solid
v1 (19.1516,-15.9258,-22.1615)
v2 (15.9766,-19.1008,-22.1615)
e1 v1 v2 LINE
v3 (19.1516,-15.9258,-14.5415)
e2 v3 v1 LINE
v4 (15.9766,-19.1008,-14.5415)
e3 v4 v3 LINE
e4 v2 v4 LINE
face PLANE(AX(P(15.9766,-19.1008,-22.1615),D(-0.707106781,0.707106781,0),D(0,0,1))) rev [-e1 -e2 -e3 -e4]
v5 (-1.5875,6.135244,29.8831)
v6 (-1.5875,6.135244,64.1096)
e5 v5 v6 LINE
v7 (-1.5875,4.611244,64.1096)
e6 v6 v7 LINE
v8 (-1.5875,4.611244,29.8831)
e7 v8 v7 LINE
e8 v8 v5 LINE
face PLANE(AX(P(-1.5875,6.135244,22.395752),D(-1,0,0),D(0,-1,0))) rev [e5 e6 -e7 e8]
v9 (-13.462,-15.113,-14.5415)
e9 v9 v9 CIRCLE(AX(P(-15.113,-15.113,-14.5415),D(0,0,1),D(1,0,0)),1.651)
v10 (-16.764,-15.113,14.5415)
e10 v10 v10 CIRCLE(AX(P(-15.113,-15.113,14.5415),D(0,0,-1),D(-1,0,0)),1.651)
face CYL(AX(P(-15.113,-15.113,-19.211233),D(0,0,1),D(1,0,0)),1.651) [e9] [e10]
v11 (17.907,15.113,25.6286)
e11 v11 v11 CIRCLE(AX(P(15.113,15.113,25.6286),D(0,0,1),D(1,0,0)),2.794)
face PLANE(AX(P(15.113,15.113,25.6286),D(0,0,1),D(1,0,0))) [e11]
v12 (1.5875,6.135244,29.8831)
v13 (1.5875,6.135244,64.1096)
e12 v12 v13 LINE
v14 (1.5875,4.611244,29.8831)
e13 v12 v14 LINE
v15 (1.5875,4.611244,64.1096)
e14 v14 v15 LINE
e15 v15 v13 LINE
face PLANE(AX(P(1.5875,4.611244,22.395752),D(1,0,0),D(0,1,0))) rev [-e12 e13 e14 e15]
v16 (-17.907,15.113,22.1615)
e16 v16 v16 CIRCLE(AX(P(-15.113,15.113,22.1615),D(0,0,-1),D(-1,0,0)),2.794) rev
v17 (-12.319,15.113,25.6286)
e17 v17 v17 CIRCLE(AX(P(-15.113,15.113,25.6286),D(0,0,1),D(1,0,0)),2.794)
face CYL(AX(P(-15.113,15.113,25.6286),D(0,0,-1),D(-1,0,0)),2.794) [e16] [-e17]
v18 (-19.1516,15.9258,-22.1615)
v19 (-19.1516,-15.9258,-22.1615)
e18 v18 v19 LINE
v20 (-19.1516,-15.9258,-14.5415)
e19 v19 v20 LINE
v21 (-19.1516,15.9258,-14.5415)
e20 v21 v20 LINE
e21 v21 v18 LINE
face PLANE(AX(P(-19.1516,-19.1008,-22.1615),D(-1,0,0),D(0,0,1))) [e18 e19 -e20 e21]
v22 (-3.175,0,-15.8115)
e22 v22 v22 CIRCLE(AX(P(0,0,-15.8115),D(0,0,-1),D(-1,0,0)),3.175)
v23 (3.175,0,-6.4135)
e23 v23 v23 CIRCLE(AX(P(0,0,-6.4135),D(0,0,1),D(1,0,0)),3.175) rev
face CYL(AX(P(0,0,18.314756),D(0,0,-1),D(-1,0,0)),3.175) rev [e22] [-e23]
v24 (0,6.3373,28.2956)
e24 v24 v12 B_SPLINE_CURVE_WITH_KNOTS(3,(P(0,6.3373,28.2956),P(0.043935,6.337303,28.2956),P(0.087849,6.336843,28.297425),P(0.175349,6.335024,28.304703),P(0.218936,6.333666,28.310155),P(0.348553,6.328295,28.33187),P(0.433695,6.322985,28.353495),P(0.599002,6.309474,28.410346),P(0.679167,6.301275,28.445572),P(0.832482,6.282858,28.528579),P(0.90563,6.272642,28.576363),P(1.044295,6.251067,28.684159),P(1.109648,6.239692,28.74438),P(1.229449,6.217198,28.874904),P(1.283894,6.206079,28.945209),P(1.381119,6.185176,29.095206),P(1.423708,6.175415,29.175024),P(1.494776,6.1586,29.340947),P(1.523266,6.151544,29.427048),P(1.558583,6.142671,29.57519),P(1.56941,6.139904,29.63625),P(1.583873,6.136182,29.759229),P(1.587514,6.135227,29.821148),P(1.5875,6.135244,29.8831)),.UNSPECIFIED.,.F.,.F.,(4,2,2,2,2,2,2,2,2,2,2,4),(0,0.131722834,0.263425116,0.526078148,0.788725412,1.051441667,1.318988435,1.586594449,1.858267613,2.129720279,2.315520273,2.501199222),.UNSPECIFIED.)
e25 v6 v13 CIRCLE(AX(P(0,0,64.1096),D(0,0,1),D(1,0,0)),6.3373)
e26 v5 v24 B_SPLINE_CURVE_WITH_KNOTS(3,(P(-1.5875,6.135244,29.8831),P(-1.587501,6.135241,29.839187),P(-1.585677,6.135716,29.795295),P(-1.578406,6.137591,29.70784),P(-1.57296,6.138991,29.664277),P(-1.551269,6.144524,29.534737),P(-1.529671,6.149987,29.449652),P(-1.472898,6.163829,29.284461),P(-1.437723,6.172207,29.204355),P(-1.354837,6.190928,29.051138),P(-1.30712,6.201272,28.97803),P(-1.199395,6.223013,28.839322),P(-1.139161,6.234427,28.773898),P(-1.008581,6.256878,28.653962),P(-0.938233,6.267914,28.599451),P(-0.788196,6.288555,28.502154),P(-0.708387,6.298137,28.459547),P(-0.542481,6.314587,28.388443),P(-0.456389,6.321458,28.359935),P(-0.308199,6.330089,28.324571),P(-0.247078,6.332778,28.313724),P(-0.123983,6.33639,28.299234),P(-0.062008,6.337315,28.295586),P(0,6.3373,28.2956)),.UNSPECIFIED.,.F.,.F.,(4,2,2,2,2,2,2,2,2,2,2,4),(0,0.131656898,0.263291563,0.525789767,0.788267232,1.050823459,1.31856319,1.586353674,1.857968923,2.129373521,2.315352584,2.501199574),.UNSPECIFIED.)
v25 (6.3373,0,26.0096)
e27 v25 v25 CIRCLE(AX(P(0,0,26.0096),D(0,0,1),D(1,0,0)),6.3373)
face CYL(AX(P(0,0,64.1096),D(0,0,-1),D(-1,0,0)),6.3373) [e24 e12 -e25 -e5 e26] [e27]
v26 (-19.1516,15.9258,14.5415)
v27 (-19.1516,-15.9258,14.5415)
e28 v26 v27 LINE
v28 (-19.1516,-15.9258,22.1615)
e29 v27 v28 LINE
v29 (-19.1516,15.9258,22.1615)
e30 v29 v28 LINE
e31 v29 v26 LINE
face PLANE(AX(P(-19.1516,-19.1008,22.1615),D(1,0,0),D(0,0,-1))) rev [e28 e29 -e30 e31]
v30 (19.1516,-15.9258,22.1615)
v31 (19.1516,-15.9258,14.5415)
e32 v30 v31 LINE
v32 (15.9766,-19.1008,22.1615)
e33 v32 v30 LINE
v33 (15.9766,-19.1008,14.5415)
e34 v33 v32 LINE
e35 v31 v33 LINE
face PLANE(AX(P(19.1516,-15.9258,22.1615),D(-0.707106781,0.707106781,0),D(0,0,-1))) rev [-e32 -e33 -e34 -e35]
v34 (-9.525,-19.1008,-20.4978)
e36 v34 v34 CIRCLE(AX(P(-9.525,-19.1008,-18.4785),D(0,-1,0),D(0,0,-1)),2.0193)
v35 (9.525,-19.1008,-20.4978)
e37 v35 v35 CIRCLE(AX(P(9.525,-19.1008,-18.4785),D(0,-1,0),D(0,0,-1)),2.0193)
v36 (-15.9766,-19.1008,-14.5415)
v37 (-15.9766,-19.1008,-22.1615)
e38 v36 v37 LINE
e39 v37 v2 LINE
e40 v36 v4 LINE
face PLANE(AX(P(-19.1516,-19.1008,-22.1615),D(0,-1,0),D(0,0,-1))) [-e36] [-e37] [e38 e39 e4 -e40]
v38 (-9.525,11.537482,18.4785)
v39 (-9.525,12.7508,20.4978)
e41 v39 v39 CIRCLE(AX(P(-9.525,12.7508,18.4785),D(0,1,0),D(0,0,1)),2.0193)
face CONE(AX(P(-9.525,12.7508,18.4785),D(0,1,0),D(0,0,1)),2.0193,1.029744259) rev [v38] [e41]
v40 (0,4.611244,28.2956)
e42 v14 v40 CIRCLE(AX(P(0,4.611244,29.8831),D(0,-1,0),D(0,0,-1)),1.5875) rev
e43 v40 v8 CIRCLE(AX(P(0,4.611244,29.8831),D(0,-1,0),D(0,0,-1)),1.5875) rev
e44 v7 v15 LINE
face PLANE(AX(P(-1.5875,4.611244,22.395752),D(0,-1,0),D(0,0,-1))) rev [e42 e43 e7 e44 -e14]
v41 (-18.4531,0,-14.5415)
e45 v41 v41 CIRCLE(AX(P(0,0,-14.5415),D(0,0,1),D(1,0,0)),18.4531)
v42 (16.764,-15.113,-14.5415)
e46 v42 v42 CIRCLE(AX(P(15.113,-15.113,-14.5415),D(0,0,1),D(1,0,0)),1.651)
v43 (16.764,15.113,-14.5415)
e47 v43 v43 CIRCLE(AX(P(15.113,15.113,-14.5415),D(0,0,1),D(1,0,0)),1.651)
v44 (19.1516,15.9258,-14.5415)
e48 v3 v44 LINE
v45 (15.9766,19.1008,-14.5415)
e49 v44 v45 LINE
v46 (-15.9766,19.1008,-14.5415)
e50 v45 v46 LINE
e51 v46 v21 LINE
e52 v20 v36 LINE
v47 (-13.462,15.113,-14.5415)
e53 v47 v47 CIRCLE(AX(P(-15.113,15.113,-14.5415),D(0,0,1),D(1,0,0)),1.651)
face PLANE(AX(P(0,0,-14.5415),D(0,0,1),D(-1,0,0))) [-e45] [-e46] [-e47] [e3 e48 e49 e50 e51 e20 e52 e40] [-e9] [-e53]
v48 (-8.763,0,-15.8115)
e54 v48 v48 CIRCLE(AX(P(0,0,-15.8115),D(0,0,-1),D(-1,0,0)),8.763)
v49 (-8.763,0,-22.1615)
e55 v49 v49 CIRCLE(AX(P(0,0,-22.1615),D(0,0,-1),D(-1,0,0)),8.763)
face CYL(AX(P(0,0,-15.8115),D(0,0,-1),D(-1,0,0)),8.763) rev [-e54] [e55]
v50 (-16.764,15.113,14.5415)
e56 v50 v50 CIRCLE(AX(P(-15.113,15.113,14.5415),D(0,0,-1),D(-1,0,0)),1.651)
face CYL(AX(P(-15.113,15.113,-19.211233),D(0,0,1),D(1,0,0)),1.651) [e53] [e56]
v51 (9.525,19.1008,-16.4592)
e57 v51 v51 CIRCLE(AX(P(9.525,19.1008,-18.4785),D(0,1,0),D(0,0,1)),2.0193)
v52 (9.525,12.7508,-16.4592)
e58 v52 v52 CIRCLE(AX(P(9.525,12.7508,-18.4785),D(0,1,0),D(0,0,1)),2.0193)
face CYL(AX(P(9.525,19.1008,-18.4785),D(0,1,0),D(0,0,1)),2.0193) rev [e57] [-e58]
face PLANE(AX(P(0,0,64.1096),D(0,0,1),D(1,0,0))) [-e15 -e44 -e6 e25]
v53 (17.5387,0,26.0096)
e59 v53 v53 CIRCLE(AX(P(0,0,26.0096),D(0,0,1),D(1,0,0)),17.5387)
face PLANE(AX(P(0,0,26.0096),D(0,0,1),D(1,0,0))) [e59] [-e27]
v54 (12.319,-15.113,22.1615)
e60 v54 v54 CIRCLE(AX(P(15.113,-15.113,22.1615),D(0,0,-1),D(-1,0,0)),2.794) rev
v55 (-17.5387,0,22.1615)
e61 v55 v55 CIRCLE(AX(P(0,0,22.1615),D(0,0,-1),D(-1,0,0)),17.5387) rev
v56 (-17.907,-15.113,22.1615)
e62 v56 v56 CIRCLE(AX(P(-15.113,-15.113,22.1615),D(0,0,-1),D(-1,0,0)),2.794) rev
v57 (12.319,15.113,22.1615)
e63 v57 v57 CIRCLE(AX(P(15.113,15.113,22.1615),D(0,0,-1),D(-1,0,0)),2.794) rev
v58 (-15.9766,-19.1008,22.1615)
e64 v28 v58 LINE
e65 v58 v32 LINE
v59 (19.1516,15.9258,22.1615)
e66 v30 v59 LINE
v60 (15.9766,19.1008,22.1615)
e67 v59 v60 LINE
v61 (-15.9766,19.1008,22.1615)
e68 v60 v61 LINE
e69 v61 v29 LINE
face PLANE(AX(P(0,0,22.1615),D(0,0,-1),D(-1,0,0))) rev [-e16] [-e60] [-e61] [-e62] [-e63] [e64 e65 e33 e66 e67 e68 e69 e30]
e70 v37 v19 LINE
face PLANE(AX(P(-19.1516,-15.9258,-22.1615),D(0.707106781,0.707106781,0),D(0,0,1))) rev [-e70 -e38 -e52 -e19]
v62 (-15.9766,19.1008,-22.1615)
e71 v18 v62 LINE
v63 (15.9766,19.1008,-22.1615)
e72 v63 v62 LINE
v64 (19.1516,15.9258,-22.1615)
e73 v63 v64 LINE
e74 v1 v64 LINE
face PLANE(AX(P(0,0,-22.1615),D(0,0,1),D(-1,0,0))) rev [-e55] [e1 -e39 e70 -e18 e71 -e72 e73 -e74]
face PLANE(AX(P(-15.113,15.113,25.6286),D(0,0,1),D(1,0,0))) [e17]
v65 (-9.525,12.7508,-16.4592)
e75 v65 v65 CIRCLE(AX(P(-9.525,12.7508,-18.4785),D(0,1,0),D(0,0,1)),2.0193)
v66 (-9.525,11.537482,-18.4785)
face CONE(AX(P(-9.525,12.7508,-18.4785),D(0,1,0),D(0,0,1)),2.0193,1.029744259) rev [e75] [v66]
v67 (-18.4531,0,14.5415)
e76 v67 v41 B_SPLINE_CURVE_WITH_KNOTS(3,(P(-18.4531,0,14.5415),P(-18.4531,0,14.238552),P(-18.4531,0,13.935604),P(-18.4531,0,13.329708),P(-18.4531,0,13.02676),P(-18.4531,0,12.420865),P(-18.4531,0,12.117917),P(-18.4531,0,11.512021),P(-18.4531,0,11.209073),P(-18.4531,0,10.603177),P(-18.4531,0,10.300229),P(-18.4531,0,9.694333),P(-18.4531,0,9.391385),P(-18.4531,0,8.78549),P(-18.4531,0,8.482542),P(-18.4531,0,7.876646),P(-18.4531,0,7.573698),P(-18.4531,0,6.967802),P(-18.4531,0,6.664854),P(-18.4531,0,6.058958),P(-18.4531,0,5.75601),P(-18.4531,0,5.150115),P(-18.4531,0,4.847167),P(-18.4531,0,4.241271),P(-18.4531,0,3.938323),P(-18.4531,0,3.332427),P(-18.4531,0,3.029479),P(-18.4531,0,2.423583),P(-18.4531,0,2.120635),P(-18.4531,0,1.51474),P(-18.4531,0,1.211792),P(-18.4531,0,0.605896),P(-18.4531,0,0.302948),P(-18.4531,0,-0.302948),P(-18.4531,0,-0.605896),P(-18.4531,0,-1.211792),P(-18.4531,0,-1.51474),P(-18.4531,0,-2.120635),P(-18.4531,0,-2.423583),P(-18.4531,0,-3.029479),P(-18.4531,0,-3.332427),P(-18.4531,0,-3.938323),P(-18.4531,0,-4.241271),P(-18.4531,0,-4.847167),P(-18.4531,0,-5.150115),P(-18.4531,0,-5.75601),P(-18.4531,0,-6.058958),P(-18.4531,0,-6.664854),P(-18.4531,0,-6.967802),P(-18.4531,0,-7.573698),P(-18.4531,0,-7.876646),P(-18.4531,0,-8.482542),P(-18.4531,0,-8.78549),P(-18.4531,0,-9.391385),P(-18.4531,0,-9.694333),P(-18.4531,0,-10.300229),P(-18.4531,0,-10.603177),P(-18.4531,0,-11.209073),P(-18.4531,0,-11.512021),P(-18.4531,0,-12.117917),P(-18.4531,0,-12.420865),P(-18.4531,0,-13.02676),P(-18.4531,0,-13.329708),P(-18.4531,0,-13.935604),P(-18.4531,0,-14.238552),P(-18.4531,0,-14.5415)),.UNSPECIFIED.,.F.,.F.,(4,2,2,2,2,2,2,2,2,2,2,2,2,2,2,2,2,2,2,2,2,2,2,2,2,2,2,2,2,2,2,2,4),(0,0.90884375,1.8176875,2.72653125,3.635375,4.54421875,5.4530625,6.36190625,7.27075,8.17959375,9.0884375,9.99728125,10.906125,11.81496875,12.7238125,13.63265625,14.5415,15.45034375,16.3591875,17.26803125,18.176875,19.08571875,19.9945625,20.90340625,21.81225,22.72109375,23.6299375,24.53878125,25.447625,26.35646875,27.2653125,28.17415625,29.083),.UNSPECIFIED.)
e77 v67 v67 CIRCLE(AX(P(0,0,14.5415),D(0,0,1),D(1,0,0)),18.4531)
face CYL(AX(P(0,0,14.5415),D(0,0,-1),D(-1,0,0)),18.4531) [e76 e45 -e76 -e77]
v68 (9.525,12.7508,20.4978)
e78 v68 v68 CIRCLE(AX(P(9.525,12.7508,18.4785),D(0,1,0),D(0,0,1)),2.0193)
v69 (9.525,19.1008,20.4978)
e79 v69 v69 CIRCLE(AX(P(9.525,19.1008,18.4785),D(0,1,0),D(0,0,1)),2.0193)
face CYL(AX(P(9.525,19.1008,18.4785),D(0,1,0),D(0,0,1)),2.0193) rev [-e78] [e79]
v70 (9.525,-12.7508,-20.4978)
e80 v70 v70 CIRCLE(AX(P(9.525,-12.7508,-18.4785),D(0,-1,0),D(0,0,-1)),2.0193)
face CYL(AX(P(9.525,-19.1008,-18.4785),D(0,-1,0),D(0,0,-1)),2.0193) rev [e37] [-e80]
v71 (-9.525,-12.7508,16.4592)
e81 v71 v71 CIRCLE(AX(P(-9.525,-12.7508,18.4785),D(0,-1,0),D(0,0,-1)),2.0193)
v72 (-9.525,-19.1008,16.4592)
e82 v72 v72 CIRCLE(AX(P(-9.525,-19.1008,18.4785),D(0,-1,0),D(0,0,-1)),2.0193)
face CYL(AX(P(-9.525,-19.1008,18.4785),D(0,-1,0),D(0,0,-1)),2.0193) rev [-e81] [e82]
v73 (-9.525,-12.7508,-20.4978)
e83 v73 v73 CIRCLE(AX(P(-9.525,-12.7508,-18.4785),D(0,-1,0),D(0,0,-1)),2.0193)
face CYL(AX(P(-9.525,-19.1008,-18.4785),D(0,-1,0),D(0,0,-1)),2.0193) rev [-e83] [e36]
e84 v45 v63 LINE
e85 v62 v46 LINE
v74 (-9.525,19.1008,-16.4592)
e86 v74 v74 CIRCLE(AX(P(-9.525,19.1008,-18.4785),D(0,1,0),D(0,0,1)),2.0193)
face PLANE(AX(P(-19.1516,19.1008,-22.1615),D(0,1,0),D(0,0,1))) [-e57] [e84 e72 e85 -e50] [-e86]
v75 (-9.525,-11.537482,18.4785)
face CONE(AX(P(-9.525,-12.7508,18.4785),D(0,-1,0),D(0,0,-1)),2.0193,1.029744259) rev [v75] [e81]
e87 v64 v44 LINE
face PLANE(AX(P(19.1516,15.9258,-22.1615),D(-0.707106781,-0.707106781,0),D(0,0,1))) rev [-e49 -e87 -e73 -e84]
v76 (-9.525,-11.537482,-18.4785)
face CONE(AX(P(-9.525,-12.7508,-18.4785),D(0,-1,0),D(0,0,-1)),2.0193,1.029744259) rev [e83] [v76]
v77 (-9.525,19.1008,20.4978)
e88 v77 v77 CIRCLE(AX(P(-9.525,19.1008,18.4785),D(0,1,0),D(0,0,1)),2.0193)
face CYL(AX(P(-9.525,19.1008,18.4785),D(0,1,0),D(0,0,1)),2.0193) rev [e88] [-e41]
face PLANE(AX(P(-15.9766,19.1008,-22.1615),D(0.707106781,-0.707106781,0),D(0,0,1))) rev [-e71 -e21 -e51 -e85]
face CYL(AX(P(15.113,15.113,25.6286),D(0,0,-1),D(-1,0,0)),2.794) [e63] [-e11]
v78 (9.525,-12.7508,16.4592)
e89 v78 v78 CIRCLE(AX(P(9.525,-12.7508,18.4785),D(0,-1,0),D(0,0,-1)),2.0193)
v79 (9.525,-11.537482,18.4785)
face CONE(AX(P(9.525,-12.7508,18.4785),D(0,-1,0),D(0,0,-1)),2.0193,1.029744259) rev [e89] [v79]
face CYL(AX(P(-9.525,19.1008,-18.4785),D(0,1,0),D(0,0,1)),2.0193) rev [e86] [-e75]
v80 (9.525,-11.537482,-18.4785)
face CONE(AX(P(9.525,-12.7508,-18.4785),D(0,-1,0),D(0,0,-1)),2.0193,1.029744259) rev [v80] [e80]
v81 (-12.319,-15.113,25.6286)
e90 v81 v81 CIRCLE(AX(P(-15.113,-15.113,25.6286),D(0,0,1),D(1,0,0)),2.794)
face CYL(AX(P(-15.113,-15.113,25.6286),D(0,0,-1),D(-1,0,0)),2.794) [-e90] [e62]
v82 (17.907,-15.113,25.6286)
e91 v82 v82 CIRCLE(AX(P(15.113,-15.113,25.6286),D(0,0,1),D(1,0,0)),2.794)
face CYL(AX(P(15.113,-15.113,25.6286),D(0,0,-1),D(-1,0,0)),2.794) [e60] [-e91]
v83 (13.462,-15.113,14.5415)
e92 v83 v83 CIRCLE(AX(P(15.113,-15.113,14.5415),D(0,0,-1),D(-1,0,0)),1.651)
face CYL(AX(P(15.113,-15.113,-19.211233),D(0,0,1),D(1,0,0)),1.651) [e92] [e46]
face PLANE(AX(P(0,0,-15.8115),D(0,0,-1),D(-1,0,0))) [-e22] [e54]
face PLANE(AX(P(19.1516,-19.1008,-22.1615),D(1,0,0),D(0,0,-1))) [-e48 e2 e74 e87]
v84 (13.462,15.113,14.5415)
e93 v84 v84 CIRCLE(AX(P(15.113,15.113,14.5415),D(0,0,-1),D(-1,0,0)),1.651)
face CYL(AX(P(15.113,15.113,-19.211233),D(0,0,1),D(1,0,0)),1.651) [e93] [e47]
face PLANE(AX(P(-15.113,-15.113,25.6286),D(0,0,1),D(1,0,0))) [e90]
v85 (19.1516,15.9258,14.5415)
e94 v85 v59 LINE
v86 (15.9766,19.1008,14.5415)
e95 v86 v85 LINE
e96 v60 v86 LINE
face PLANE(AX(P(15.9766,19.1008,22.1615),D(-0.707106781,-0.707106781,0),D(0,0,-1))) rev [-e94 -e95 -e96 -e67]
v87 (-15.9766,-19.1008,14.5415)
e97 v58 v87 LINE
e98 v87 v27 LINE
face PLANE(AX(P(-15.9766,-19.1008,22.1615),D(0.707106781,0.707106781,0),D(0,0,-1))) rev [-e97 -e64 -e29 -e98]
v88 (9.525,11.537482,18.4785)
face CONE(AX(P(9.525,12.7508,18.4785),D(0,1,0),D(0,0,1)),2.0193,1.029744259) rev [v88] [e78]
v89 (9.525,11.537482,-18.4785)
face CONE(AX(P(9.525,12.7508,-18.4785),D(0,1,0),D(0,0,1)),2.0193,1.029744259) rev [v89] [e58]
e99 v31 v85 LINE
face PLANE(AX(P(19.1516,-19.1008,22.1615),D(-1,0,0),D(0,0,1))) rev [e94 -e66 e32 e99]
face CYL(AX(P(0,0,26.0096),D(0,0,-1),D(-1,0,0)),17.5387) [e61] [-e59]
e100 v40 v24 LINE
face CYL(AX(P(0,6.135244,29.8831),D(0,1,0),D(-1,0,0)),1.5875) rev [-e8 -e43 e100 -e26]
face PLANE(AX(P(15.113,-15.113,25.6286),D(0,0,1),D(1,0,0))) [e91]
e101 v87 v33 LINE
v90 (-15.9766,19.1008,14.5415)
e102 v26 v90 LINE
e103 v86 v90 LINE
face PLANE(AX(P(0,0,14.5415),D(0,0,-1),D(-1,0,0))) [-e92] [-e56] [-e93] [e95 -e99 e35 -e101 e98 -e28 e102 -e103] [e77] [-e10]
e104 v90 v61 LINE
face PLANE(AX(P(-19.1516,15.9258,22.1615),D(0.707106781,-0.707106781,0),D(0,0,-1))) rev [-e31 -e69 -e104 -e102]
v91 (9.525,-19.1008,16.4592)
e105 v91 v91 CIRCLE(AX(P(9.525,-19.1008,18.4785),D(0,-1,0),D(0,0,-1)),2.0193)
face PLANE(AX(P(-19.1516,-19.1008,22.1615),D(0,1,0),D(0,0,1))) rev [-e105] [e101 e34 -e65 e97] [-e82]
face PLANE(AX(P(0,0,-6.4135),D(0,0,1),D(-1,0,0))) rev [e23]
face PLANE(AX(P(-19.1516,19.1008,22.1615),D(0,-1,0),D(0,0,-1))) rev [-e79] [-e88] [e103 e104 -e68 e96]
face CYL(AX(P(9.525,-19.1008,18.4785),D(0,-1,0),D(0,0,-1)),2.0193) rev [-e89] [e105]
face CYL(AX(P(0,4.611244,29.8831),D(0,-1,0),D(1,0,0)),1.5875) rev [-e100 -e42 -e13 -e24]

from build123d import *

# Parameters (mm, degrees)
SKETCH1_R                       = 18.4531
CAN_DEPTH                       = 14.5415
SKETCH2_W                       = 38.3032
SKETCH2_H                       = 38.2016
FRONT_FLANGE_DEPTH              = 7.62
SKETCH3_R                       = 17.5387
FRONT_BEARING_DEPTH             = 3.8481
SKETCH4_R                       = 6.3373
SHAFT_DEPTH                     = 38.1
KEYWAY_START                    = -35.814
KEYWAY_DEPTH                    = 35.814
SKETCH7_R                       = 2.794
SCREW_HEADS_DEPTH               = 3.4671
SKETCH8_R                       = 1.651
SCREW_THREADS_DEPTH             = 36.703
F_10_32_TAPPED_HOLE1_AT_2_COUNT = 2
F_10_32_TAPPED_HOLE1_AT_2_PITCH = 19.05
F_10_32_TAPPED_HOLE1_AT_3_COUNT = 2
F_10_32_TAPPED_HOLE1_AT_3_PITCH = 41.577906982
F_10_32_TAPPED_HOLE1_AT_4_COUNT = 2
F_10_32_TAPPED_HOLE1_AT_4_PITCH = 36.957
SKETCH12_R                      = 8.763
BACK_RECESS_DEPTH               = 6.35
SKETCH13_R                      = 3.175
PINION_RECESS_DEPTH             = 9.398
FLANGE_CHAMFERS_SIZE            = 3.175
KEYWAY_FILLET_R                 = 1.5875


with BuildPart() as part:
    # Sketch1 → Can (new, symmetric)
    with BuildSketch(Plane.XY):
        with Locations(Location((0, 0, 0), (0, 0, 180))):
            Circle(SKETCH1_R)
    extrude(amount=CAN_DEPTH, both=True)

    # Sketch2 → Front Flange (add)
    with BuildSketch(Plane.XY.offset(14.5415)):
        Rectangle(SKETCH2_W, SKETCH2_H)
    front_flange = extrude(amount=FRONT_FLANGE_DEPTH)

    # Sketch3 → Front Bearing (add)
    with BuildSketch(Plane.XY.offset(22.1615)):
        with Locations(Location((0, 0, 0), (0, 0, 180))):
            Circle(SKETCH3_R)
    extrude(amount=FRONT_BEARING_DEPTH)

    # Sketch4 → Shaft (add)
    with BuildSketch(Plane.XY.offset(26.0096)):
        with Locations(Location((0, 0, 0), (0, 0, 180))):
            Circle(SKETCH4_R)
    extrude(amount=SHAFT_DEPTH)

    # Sketch6 → Keyway (cut)
    with BuildSketch(Plane.XY.offset(64.1096).offset(KEYWAY_START)):
        with BuildLine():
            Line((-1.5875, 6.135243682), (-1.5875, 4.611243682))
            Line((-1.5875, 4.611243682), (1.5875, 4.611243682))
            Line((1.5875, 4.611243682), (1.5875, 6.135243682))
            ThreePointArc((1.5875, 6.135243682), (0, 6.3373), (-1.5875, 6.135243682))
        make_face()
    extrude(amount=KEYWAY_DEPTH, mode=Mode.SUBTRACT)

    # Back Flange: Front Flange across plane
    add(front_flange.mirror(Plane.XY))

    # Sketch7 → Screw Heads (add)
    with BuildSketch(Plane.XY.offset(22.1615)):
        with Locations(Location((15.113, 15.113, 0), (0, 0, 180))):
            Circle(SKETCH7_R)
        with Locations(Location((-15.113, 15.113, 0), (0, 0, 180))):
            Circle(SKETCH7_R)
        with Locations(Location((-15.113, -15.113, 0), (0, 0, 180))):
            Circle(SKETCH7_R)
        with Locations(Location((15.113, -15.113, 0), (0, 0, 180))):
            Circle(SKETCH7_R)
    extrude(amount=SCREW_HEADS_DEPTH)

    # Sketch8 → Screw Threads (add)
    with BuildSketch(Plane.XY.offset(22.1615)):
        with Locations((-15.113, 15.113)):
            Circle(SKETCH8_R)
        with Locations((15.113, 15.113)):
            Circle(SKETCH8_R)
        with Locations((15.113, -15.113)):
            Circle(SKETCH8_R)
        with Locations((-15.113, -15.113)):
            Circle(SKETCH8_R)
    extrude(amount=-SCREW_THREADS_DEPTH)

    # Sketch10 → #10-32 Tapped Hole1 (revolve, cut)
    with BuildSketch(Plane(origin=(-9.525, 19.1008, 18.4785), x_dir=(0, 0, 1), z_dir=(1, 0, 0))):
        Polygon((0, 0), (0, 7.563317848), (2.0193, 6.35), (2.0193, 0), align=None)
    f_10_32_tapped_hole1 = revolve(axis=Axis((-9.525, 25.4508, 18.4785), (0, -1, 0)), mode=Mode.SUBTRACT)

    # #10-32 Tapped Hole1 at 2: #10-32 Tapped Hole1 ×2
    with Locations(*[(i * F_10_32_TAPPED_HOLE1_AT_2_PITCH, 0, 0) for i in range(1, F_10_32_TAPPED_HOLE1_AT_2_COUNT)]):
        add(f_10_32_tapped_hole1, mode=Mode.SUBTRACT)

    # #10-32 Tapped Hole1 at 3: #10-32 Tapped Hole1 ×2
    with Locations(*[Vector(0.4581760214209039, 0, -0.8888614815565536) * (i * F_10_32_TAPPED_HOLE1_AT_3_PITCH) for i in range(1, F_10_32_TAPPED_HOLE1_AT_3_COUNT)]):
        add(f_10_32_tapped_hole1, mode=Mode.SUBTRACT)

    # #10-32 Tapped Hole1 at 4: #10-32 Tapped Hole1 ×2
    with Locations(*[(0, 0, -i * F_10_32_TAPPED_HOLE1_AT_4_PITCH) for i in range(1, F_10_32_TAPPED_HOLE1_AT_4_COUNT)]):
        add(f_10_32_tapped_hole1, mode=Mode.SUBTRACT)

    # #10-32 Tapped Hole2: #10-32 Tapped Hole1 across plane
    add(f_10_32_tapped_hole1.mirror(Plane.ZX), mode=Mode.SUBTRACT)

    # #10-32 Tapped Hole2 copy 1 sketch → #10-32 Tapped Hole2 copy 1 (revolve, cut)
    with BuildSketch(Plane(origin=(9.525, -19.1008, 18.4785), x_dir=(0, 0, 1), z_dir=(1, 0, 0))):
        Polygon((0, 0), (0, -7.563317848), (2.0193, -6.35), (2.0193, 0), align=None)
    revolve(axis=Axis((9.525, -25.4508, 18.4785), (0, -1, 0)), mode=Mode.SUBTRACT)

    # #10-32 Tapped Hole2 copy 2 sketch → #10-32 Tapped Hole2 copy 2 (revolve, cut)
    with BuildSketch(Plane(origin=(9.525, -19.1008, -18.4785), x_dir=(0, 0, 1), z_dir=(1, 0, 0))):
        Polygon((0, 0), (0, -7.563317848), (2.0193, -6.35), (2.0193, 0), align=None)
    revolve(axis=Axis((9.525, -25.4508, -18.4785), (0, -1, 0)), mode=Mode.SUBTRACT)

    # #10-32 Tapped Hole2 copy 3 sketch → #10-32 Tapped Hole2 copy 3 (revolve, cut)
    with BuildSketch(Plane(origin=(-9.525, -19.1008, -18.4785), x_dir=(0, 0, 1), z_dir=(1, 0, 0))):
        Polygon((0, 0), (0, -7.563317848), (2.0193, -6.35), (2.0193, 0), align=None)
    revolve(axis=Axis((-9.525, -25.4508, -18.4785), (0, -1, 0)), mode=Mode.SUBTRACT)

    # Sketch12 → Back Recess (cut)
    with BuildSketch(Plane(origin=(0, 0, -22.1615), x_dir=(-1, 0, 0), z_dir=(0, 0, -1))):
        Circle(SKETCH12_R)
    extrude(amount=-BACK_RECESS_DEPTH, mode=Mode.SUBTRACT)

    # Sketch13 → Pinion Recess (cut)
    with BuildSketch(Plane(origin=(0, 0, -15.8115), x_dir=(-1, 0, 0), z_dir=(0, 0, -1))):
        Circle(SKETCH13_R)
    extrude(amount=-PINION_RECESS_DEPTH, mode=Mode.SUBTRACT)

    # Flange Chamfers
    flange_chamfers_edges = [part.edges().sort_by_distance(p)[0] for p in [
        (19.1516, 19.1008, -18.3515),
        (19.1516, -19.1008, -18.3515),
        (-19.1516, -19.1008, -18.3515),
        (-19.1516, 19.1008, -18.3515),
        (19.1516, -19.1008, 18.3515),
        (19.1516, 19.1008, 18.3515),
        (-19.1516, 19.1008, 18.3515),
        (-19.1516, -19.1008, 18.3515),
    ]]
    chamfer(flange_chamfers_edges, length=FLANGE_CHAMFERS_SIZE)

    # Keyway Fillet
    keyway_fillet_edges = [part.edges().sort_by_distance(p)[0] for p in [
        (-1.5875, 5.373243682, 28.2956),
        (1.5875, 5.373243682, 28.2956),
    ]]
    fillet(keyway_fillet_edges, radius=KEYWAY_FILLET_R - 0.0001)  # a hair under: the kernel refuses the full size


solid = part.part
